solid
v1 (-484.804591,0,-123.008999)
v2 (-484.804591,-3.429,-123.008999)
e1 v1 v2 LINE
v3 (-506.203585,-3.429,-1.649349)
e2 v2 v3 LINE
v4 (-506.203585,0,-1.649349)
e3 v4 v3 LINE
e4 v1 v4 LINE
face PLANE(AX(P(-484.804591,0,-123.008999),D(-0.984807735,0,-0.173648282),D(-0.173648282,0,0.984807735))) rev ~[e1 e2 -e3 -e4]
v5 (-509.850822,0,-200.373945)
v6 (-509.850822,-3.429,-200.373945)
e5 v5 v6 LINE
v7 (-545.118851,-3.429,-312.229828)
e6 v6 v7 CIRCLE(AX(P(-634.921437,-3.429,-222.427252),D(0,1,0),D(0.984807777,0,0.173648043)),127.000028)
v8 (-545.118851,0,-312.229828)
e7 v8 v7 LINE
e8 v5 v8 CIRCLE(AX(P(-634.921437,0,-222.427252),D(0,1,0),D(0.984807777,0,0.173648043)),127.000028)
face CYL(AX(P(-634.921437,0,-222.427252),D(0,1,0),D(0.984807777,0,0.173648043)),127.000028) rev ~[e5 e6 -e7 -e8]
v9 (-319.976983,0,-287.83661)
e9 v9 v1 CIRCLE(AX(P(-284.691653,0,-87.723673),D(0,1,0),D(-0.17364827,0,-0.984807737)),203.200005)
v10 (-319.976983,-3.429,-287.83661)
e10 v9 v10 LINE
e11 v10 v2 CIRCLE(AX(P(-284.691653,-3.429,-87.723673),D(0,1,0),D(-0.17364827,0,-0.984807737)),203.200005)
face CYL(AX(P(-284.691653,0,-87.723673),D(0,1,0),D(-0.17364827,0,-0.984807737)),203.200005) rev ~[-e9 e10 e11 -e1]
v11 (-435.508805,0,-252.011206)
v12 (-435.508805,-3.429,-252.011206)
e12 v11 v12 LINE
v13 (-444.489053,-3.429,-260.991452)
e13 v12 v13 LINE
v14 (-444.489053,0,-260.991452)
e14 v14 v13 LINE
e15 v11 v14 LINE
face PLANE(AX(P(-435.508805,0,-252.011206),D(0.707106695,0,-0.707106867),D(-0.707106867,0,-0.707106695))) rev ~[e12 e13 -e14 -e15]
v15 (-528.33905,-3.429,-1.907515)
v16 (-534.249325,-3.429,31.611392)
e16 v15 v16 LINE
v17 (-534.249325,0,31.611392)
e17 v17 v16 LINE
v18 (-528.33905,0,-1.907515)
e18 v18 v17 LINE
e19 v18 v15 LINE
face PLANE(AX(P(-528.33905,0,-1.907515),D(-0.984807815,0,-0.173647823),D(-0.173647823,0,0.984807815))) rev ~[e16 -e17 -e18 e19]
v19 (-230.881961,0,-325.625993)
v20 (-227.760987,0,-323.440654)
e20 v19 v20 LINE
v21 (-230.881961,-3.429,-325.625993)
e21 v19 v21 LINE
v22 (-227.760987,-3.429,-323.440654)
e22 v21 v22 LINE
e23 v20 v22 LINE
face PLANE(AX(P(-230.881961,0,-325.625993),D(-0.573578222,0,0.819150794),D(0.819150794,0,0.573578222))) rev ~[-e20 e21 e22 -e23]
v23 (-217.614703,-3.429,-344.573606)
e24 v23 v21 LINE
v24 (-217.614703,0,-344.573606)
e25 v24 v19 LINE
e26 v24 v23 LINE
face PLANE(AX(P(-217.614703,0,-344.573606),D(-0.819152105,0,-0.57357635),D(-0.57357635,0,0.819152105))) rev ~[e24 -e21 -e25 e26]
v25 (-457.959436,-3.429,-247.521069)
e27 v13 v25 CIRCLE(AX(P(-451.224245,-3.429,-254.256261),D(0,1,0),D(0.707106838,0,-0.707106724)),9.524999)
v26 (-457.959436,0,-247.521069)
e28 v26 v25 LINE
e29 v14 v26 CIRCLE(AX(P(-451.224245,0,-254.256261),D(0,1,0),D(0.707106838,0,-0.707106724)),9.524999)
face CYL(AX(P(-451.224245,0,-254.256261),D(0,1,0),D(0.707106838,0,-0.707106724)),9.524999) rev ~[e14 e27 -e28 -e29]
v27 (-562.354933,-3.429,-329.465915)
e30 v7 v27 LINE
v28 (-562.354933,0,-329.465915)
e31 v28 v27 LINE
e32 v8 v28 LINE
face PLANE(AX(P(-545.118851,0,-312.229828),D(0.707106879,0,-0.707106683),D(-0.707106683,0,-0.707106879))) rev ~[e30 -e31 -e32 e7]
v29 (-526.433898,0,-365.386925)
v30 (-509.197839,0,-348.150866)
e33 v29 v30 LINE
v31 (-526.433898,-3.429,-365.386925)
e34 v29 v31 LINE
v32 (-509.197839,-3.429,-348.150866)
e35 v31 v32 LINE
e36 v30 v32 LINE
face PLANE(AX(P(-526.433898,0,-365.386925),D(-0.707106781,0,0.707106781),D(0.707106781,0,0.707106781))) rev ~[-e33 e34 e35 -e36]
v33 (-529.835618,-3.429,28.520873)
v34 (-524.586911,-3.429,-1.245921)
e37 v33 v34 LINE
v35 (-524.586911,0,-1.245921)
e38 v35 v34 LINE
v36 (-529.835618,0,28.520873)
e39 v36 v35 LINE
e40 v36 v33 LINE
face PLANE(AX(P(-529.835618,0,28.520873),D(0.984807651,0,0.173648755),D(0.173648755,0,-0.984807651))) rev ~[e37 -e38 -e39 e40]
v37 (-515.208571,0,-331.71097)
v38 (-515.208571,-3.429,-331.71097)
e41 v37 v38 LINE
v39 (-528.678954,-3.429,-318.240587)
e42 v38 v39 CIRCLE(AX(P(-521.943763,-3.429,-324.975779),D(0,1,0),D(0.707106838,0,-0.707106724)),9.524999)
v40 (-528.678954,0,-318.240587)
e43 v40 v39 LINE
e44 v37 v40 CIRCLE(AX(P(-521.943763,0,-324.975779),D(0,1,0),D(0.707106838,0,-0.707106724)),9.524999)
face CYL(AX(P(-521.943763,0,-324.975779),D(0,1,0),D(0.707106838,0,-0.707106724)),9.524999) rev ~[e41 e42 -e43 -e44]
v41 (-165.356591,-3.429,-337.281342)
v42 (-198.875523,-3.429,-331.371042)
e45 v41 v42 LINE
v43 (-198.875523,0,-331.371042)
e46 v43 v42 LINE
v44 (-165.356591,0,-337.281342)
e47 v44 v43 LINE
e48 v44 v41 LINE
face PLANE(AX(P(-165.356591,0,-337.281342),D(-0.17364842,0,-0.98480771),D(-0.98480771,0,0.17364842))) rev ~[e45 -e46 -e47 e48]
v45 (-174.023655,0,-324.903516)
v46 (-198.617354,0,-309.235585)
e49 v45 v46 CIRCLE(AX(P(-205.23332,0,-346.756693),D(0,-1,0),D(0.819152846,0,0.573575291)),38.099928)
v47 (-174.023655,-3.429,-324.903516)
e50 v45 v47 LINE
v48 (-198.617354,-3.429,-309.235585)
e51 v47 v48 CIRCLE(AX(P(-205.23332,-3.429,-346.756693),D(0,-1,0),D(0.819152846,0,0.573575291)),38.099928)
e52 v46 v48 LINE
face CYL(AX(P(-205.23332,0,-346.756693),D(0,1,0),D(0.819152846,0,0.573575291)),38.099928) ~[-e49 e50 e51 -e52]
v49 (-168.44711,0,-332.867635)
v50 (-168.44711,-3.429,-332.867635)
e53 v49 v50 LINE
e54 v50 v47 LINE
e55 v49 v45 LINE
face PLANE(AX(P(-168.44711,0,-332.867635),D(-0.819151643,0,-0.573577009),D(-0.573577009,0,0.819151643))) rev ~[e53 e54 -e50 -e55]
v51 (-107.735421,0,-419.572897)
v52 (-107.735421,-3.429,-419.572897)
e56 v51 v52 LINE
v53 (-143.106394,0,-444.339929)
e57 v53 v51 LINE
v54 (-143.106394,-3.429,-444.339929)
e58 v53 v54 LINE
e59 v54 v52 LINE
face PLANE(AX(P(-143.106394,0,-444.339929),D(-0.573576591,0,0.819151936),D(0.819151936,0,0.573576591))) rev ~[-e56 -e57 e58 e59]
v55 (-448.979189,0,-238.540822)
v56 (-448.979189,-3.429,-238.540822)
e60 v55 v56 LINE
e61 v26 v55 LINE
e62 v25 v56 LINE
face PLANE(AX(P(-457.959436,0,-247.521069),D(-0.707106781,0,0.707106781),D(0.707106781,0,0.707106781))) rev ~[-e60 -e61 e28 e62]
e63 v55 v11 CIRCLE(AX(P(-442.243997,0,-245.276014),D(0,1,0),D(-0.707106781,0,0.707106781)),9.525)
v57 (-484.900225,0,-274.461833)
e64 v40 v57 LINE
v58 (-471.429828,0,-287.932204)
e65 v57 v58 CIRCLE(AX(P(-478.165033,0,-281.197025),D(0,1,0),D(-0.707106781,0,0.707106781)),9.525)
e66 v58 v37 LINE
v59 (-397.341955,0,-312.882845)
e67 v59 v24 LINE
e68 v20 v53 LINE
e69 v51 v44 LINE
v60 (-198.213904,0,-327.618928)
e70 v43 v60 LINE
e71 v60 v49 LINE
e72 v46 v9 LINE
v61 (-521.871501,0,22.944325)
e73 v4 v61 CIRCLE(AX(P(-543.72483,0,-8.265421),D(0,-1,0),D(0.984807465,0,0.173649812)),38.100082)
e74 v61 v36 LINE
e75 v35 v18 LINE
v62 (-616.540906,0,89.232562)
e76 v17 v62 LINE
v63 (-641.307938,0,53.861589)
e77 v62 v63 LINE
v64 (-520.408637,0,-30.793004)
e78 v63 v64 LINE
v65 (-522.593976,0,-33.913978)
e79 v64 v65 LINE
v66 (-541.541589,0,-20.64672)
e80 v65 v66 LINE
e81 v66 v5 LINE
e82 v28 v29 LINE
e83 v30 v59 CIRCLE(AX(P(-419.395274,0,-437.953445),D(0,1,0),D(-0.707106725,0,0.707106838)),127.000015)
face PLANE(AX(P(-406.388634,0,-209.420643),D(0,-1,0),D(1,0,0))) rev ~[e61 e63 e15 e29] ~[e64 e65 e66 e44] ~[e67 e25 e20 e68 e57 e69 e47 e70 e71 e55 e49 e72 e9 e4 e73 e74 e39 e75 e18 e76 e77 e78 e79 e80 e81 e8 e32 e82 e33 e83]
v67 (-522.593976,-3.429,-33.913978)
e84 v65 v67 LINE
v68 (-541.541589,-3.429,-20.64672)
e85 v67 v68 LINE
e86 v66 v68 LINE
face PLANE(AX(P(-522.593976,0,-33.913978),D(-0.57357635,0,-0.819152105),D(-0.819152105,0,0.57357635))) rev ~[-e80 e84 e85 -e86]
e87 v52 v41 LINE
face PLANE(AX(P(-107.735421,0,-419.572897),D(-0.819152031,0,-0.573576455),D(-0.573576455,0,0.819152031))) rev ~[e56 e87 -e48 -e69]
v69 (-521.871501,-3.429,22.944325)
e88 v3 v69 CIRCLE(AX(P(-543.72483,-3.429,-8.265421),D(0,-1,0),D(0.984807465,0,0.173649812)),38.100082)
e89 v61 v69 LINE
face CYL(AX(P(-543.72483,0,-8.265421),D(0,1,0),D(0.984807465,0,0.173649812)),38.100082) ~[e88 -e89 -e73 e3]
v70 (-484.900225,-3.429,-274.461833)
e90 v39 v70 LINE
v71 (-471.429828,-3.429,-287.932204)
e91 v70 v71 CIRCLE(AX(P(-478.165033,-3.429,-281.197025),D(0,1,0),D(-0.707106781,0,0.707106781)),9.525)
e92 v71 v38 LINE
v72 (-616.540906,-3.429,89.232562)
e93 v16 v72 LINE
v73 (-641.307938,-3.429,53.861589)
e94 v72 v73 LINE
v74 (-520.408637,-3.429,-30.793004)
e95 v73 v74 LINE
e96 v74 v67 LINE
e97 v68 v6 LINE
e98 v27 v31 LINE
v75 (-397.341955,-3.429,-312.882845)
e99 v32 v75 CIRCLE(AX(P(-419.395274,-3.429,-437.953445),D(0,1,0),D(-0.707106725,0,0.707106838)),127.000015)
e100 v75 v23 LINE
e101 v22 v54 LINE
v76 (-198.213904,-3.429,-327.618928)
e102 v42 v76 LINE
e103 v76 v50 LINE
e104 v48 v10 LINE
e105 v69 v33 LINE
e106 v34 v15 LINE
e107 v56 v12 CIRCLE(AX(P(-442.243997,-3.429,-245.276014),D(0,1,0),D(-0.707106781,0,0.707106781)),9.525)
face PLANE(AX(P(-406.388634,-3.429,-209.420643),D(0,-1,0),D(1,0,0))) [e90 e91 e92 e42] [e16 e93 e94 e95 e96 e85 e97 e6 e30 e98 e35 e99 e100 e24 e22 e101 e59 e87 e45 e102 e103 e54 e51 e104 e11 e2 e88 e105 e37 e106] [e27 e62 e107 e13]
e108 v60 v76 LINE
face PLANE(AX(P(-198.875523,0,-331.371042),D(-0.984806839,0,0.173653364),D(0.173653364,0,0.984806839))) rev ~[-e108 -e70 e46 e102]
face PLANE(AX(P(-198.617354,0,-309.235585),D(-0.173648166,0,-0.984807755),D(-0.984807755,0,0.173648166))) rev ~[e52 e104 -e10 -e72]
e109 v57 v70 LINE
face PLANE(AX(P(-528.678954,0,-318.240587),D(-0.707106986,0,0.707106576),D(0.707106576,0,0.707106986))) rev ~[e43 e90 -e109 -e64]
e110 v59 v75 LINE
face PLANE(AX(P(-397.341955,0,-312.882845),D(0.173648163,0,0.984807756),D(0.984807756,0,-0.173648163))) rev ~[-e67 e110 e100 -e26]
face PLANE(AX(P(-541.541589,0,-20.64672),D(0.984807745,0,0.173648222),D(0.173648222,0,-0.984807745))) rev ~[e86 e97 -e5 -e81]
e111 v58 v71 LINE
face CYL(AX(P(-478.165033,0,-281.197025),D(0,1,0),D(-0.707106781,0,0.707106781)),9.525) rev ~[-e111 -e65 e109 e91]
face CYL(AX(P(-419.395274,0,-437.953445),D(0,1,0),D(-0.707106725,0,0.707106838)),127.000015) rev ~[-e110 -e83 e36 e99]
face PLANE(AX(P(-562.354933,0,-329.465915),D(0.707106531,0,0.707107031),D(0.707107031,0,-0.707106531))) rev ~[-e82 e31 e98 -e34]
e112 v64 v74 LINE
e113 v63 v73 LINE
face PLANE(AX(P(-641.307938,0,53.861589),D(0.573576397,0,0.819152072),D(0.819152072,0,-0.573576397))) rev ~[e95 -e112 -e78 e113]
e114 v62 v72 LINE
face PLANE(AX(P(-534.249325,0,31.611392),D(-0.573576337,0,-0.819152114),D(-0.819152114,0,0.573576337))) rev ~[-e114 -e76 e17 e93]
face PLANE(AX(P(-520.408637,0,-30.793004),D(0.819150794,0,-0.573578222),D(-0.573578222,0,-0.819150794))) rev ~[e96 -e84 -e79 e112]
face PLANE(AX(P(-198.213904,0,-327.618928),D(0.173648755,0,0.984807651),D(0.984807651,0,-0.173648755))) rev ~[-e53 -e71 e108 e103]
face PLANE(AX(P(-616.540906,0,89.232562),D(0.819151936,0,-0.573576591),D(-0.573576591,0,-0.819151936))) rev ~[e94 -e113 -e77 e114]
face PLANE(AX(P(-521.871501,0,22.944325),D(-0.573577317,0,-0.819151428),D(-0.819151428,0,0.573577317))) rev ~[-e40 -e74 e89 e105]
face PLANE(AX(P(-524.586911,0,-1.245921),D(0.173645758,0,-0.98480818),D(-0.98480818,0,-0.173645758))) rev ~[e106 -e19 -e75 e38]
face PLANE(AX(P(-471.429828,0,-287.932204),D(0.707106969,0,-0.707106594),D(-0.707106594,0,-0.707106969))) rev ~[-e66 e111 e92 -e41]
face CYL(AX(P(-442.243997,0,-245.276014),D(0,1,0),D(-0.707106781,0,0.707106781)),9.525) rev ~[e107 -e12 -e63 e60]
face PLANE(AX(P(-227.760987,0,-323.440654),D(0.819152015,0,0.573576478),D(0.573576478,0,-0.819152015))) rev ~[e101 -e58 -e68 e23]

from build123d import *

# Parameters (mm, degrees)
F1_DEPTH = 3.429


# Not quite as in the source:
# - ends of sketch curves that miss each other by under 0.0002 mm in the source are joined


with BuildPart() as f1:
    # F0 (on Front) → F1 (new body)
    with BuildSketch(Plane.XZ):
        with BuildLine():
            Line((-198.875523, -331.3710416), (-198.2139038, -327.6189282))
            Line((-198.2139038, -327.6189282), (-168.4471104, -332.867635))
            Line((-168.4471104, -332.867635), (-174.023655, -324.9035158))
            ThreePointArc((-174.023655, -324.9035158), (-184.7622274276, -314.6235496681), (-198.6173544615, -309.2355853348))
            Line((-198.6173544615, -309.2355853348), (-319.9769826, -287.83661))
            ThreePointArc((-319.9769826, -287.83661), (-428.3757561371, -231.4077731371), (-484.8045910801, -123.0089992615))
            Line((-484.8045910801, -123.0089992615), (-506.203585, -1.649349))
            ThreePointArc((-506.203585, -1.649349), (-511.5915580136, 12.2057554868), (-521.8715008941, 22.9443250094))
            Line((-521.8715008941, 22.9443250094), (-529.835618, 28.5208726))
            Line((-529.835618, 28.5208726), (-524.5869112, -1.2459208))
            Line((-524.5869112, -1.2459208), (-528.33905, -1.9075146))
            Line((-528.33905, -1.9075146), (-534.2493252, 31.6113922))
            Line((-534.2493252, 31.6113922), (-616.5409056, 89.2325622))
            Line((-616.5409056, 89.2325622), (-641.3079376, 53.861589))
            Line((-641.3079376, 53.861589), (-520.4086366, -30.7930042))
            Line((-520.4086366, -30.7930042), (-522.5939764, -33.9139784))
            Line((-522.5939764, -33.9139784), (-541.541589, -20.6467202))
            Line((-541.541589, -20.6467202), (-509.8508218, -200.3739452))
            ThreePointArc((-509.8508218, -200.3739452), (-513.7993593908, -260.6169022992), (-545.1188511893, -312.2298278107))
            Line((-545.1188511893, -312.2298278107), (-562.3549332, -329.4659146))
            Line((-562.3549332, -329.4659146), (-526.4338976, -365.3869248))
            Line((-526.4338976, -365.3869248), (-509.1978386, -348.1508658))
            ThreePointArc((-509.1978386, -348.1508658), (-457.5849106992, -316.8313763908), (-397.341954706, -312.8828450725))
            Line((-397.341954706, -312.8828450725), (-217.6147032, -344.573606))
            Line((-217.6147032, -344.573606), (-230.8819614, -325.6259934))
            Line((-230.8819614, -325.6259934), (-227.7609872, -323.4406536))
            Line((-227.7609872, -323.4406536), (-143.106394, -444.3399292))
            Line((-143.106394, -444.3399292), (-107.7354208, -419.5728972))
            Line((-107.7354208, -419.5728972), (-165.3565908, -337.2813422))
            Line((-165.3565908, -337.2813422), (-198.875523, -331.3710416))
        make_face()
        with BuildLine():
            ThreePointArc((-484.9002250908, -274.4618325092), (-471.4298472592, -274.4618261592), (-471.4298282092, -287.9322039908))
            Line((-471.4298282092, -287.9322039908), (-515.2085708, -331.7109698))
            ThreePointArc((-515.2085708, -331.7109698), (-528.6789538908, -331.7109708908), (-528.6789538908, -318.2405867092))
            Line((-528.6789538908, -318.2405867092), (-484.9002250908, -274.4618325092))
        make_face(mode=Mode.SUBTRACT)
        with BuildLine():
            ThreePointArc((-448.9791894908, -238.5408223092), (-435.5088053092, -238.5408223092), (-435.5088053092, -252.0112064908))
            Line((-435.5088053092, -252.0112064908), (-444.4890526, -260.9914516))
            ThreePointArc((-444.4890526, -260.9914516), (-457.9594356908, -260.9914526908), (-457.9594356908, -247.5210685092))
            Line((-457.9594356908, -247.5210685092), (-448.9791894908, -238.5408223092))
        make_face(mode=Mode.SUBTRACT)
    extrude(amount=F1_DEPTH)


solid = f1.part
